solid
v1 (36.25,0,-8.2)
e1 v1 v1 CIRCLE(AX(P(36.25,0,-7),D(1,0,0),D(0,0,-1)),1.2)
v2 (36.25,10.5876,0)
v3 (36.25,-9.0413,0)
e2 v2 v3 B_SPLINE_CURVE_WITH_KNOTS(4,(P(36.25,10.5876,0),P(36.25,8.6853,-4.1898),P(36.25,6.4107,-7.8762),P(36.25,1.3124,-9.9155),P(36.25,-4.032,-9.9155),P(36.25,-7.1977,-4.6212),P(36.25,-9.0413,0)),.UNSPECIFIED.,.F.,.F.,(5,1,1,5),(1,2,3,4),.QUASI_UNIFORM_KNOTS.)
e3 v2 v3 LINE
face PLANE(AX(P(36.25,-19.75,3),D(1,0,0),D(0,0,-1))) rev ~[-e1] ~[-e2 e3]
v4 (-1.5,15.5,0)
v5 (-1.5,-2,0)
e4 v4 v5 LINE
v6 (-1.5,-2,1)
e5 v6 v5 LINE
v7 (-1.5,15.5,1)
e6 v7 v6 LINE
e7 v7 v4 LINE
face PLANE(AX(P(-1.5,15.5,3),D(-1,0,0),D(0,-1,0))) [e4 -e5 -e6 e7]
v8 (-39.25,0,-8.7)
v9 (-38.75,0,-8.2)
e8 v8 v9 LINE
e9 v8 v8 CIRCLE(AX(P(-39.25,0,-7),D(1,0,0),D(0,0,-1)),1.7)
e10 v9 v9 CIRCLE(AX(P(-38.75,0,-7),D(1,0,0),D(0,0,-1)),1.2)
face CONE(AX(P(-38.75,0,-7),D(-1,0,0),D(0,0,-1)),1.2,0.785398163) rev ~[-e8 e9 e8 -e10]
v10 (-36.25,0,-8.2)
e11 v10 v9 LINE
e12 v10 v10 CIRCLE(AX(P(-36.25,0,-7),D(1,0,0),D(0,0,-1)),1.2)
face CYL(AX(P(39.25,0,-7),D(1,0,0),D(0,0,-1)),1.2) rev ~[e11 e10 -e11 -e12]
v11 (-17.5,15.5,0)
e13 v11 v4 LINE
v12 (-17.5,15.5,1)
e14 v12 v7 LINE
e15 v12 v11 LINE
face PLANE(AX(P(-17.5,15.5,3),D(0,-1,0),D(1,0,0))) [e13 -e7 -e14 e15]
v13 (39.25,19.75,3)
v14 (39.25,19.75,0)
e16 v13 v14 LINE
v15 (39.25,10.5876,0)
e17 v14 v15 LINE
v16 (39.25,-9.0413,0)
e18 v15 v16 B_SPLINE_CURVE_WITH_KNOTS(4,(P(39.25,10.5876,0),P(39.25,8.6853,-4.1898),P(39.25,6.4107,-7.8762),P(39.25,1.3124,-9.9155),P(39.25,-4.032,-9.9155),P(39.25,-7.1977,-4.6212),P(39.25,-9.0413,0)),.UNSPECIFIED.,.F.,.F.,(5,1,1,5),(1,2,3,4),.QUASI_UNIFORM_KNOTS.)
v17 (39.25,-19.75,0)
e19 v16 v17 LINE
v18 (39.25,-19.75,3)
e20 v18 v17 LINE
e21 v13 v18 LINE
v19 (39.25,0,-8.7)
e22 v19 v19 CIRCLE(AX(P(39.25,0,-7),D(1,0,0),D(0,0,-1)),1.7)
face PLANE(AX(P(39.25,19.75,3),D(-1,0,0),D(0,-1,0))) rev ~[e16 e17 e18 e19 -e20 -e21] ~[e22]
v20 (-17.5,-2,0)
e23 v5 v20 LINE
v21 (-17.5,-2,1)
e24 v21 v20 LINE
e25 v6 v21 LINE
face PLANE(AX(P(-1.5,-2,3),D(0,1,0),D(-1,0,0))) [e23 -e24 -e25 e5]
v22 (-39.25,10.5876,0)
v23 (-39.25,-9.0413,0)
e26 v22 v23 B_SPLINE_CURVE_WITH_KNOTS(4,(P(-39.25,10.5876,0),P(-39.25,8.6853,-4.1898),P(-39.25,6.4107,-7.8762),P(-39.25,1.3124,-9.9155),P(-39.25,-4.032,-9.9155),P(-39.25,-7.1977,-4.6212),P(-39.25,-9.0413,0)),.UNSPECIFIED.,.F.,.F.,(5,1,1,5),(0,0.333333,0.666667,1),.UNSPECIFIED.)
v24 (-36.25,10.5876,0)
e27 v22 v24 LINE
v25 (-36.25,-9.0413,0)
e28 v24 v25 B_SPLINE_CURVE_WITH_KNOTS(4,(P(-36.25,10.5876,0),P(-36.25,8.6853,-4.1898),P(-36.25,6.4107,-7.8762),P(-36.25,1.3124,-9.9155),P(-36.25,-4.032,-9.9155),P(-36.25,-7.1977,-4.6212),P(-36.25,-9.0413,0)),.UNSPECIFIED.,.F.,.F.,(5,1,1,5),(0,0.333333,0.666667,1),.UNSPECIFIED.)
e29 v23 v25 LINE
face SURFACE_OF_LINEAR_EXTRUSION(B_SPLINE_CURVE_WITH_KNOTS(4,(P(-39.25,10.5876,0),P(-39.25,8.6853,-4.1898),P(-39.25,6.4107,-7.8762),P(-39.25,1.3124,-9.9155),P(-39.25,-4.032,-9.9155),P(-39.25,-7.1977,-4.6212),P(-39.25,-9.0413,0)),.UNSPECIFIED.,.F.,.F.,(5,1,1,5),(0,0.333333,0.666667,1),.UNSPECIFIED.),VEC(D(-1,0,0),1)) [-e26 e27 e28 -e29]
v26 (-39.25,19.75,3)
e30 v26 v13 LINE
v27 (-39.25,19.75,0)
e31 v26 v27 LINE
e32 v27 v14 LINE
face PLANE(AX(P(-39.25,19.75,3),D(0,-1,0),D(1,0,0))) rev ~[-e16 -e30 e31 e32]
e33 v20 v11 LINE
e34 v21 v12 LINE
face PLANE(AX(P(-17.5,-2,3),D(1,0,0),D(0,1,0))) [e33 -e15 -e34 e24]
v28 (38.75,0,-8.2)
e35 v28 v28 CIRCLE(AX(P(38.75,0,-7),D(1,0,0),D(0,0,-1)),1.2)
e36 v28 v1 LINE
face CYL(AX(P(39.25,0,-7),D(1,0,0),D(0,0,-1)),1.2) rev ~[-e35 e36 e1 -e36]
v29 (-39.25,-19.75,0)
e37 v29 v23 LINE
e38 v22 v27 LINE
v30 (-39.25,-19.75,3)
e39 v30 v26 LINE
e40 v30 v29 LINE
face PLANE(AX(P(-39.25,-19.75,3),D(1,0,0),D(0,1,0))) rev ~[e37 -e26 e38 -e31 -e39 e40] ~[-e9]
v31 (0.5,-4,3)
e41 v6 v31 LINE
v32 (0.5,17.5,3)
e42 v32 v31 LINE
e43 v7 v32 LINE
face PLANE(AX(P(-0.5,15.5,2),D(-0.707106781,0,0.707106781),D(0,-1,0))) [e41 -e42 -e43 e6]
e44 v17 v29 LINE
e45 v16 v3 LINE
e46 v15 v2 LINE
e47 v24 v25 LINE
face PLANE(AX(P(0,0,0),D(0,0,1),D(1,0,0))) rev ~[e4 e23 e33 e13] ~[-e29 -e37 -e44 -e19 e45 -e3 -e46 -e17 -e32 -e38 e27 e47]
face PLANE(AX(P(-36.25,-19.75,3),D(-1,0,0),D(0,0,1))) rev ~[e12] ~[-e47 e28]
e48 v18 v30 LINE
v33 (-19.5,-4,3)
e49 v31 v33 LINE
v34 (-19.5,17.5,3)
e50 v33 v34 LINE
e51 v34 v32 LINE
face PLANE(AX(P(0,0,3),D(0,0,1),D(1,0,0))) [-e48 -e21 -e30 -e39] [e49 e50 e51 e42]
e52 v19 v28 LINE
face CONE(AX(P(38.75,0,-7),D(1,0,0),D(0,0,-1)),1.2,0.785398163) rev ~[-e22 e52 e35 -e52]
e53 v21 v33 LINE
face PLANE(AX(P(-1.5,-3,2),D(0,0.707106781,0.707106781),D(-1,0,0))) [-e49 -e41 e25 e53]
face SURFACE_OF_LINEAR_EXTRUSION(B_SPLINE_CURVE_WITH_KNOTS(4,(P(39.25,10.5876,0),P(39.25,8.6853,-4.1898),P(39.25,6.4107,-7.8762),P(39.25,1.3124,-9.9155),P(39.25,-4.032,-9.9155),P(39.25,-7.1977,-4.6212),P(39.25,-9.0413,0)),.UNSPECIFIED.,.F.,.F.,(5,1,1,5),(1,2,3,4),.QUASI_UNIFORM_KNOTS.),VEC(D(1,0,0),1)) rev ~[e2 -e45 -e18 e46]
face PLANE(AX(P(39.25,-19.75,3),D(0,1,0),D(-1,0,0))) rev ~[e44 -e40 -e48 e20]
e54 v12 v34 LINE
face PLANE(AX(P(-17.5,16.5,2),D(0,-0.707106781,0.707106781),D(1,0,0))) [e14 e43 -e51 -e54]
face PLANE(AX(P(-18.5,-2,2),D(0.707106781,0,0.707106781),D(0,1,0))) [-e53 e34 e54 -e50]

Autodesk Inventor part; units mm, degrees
ref_plane "YZ Plane" through (0, 0, 0) normal (1, 0, 0) x (0, 1, 0)
ref_plane "XZ Plane" through (0, 0, 0) normal (0, 1, 0) x (-1, 0, 0)
ref_plane "XY Plane" through (0, 0, 0) normal (0, 0, 1) x (1, 0, 0)
sketch "Sketch1" plane through (0, 0, 0) normal (0, 0, 1) x (1, 0, 0)
  line L0 (40, 20.5) -> (40, -20.5) projected
  line L1 (-40, 20.5) -> (40, 20.5) projected
  line L2 (-40, -20.5) -> (-40, 20.5) projected
  line L3 (40, -20.5) -> (-40, -20.5) projected
  line L4 (40, 20.5) -> (40, -20.5) projected
  line L5 (40, -20.5) -> (-40, -20.5) projected
  line L6 (-40, -20.5) -> (-40, 20.5) projected
  line L7 (-40, 20.5) -> (40, 20.5) projected
  line L8 (37, 23.5) -> (-37, 23.5) projected
  line L9 (-43, 17.5) -> (-43, -17.5) projected
  line L10 (-37, -23.5) -> (37, -23.5) projected
  line L11 (43, -17.5) -> (43, 17.5) projected
  line L12 (34.23, -11.25) -> (34.23, 10.75) projected
  line L13 (5.23, -11.25) -> (34.23, -11.25) projected
  line L14 (5.23, 10.75) -> (5.23, -11.25) projected
  line L15 (34.23, 10.75) -> (5.23, 10.75) projected
  circle A0 centre (-26.5, 0.5) radius 5 projected
  arc A1 (37, -23.5) -> (43, -17.5) centre (37, -17.5) ccw projected
  arc A2 (43, 17.5) -> (37, 23.5) centre (37, 17.5) ccw projected
  arc A3 (-37, 23.5) -> (-43, 17.5) centre (-37, 17.5) ccw projected
  arc A4 (-43, -17.5) -> (-37, -23.5) centre (-37, -17.5) ccw projected
  point P0 (0, 0)
extrude "Extrusion1" add sketch "Sketch1" along normal blind 3 contours L0 L3 L2 L1 | A2 L11 A1 L10 A4 L9 A3 L8 | L13 L14 L15 L12 | A0
sketch "Sketch2" plane through (0, 0, 3) normal (0, 0, 1) x (1, 0, 0)
  line L0 (39.5, 20) -> (-39.5, 20) projected
  line L1 (-39.5, 20) -> (-39.5, -20) projected
  line L2 (-39.5, -20) -> (39.5, -20) projected
  line L3 (39.5, -20) -> (39.5, 20) projected
  line L4 (-17.5, 15.5) -> (-1.5, 15.5)
  line L5 (-1.5, 15.5) -> (-1.5, -2)
  line L6 (-1.5, -2) -> (-17.5, -2)
  line L7 (-17.5, -2) -> (-17.5, 15.5)
  line L8 (-17.5, 15.5) -> (-1.5, -2) construction
  line L9 (-1.5, 15.5) -> (-17.5, -2) construction
  point P0 (0, 0)
  point P1 (-9.5, 6.75)
  dimension "d2" = 16
  dimension "d3" = 17.5
  dimension "d4" = 18
  dimension "d6" = 41
extrude "Extrusion2" cut sketch "Sketch2" against normal blind 3 contours L4 L5 L6 L7
chamfer "Chamfer1" distance 2 angle 45 4 edges at (-1.5, 6.75, 3) (-17.5, 6.75, 3) (-9.5, -2, 3) (-9.5, 15.5, 3)
sketch "Sketch3" plane through (0, 0, 3) normal (0, 0, 1) x (1, 0, 0)
  line L0 (37, 23.5) -> (-37, 23.5) projected
  arc A0 (-37, 23.5) -> (-43, 17.5) centre (-37, 17.5) ccw projected
  line L1 (-43, 17.5) -> (-43, -17.5) projected
  arc A1 (-43, -17.5) -> (-37, -23.5) centre (-37, -17.5) ccw projected
  line L2 (-37, -23.5) -> (37, -23.5) projected
  arc A2 (37, -23.5) -> (43, -17.5) centre (37, -17.5) ccw projected
  line L3 (43, -17.5) -> (43, 17.5) projected
  arc A3 (43, 17.5) -> (37, 23.5) centre (37, 17.5) ccw projected
  line L4 (34.23, -11.25) -> (34.23, 10.75) projected
  line L5 (5.23, -11.25) -> (34.23, -11.25) projected
  line L6 (5.23, 10.75) -> (5.23, -11.25) projected
  line L7 (34.23, 10.75) -> (5.23, 10.75) projected
  line L8 (40, 20.5) -> (40, -20.5) projected
  line L9 (-40, 20.5) -> (40, 20.5) projected
  line L10 (-40, -20.5) -> (-40, 20.5) projected
  line L11 (40, -20.5) -> (-40, -20.5) projected
  circle A4 centre (-26.5, 0.5) radius 5 projected
  point P0 (0, 0)
extrude "Extrusion3" cut sketch "Sketch3" against normal blind 3 contours A3 L3 A2 L2 A1 L1 A0 L0
sketch "Sketch4" plane through (0, 0, 3) normal (0, 0, 1) x (1, 0, 0)
  line L0 (40, 20.5) -> (-40, 20.5) projected
  line L1 (-40, 20.5) -> (-40, -20.5) projected
  line L2 (-40, -20.5) -> (40, -20.5) projected
  line L3 (40, -20.5) -> (40, 20.5) projected
  line L4 (-39.25, 19.75) -> (39.25, 19.75)
  line L5 (39.25, 19.75) -> (39.25, -19.75)
  line L6 (39.25, -19.75) -> (-39.25, -19.75)
  line L7 (-39.25, -19.75) -> (-39.25, 19.75)
  line L8 (-39.25, 19.75) -> (39.25, -19.75) construction
  line L9 (39.25, 19.75) -> (-39.25, -19.75) construction
  point P0 (0, 0)
  dimension "d14" = 78.5
  dimension "d15" = 39.5
extrude "Extrusion4" cut sketch "Sketch4" against normal blind 3
sketch "Sketch5" plane through (0, 0, 0) normal (0, 0, -1) x (-1, 0, 0)
  line L0 (39.25, -19.75) -> (39.25, 19.75) projected
  line L1 (39.25, 19.75) -> (-39.25, 19.75) projected
  line L2 (-39.25, 19.75) -> (-39.25, -19.75) projected
  line L3 (-39.25, -19.75) -> (39.25, -19.75) projected
  line L4 (17.5, 15.5) -> (17.5, -2) projected
  line L5 (17.5, -2) -> (1.5, -2) projected
  line L6 (1.5, -2) -> (1.5, 15.5) projected
  line L7 (1.5, 15.5) -> (17.5, 15.5) projected
  point P0 (0, 0)
sketch "Sketch6" plane through (39.25, -19.75, 3) normal (1, 0, 0) x (0, 0, -1)
  line L0 (3, 39.5) -> (3, 0) projected
  line L1 (3, 30.3376) -> (7.1898, 28.4353) construction
  line L2 (7.1898, 28.4353) -> (10.8762, 26.1607) construction
  line L3 (10.8762, 26.1607) -> (12.9155, 21.0624) construction
  line L4 (12.9155, 21.0624) -> (12.9155, 15.718) construction
  line L5 (12.9155, 15.718) -> (7.6212, 12.5523) construction
  line L6 (7.6212, 12.5523) -> (3, 10.7087) construction
  spline S0 degree 4 poles (3, 30.3376) (7.1898, 28.4353) (10.8762, 26.1607) (12.9155, 21.0624) (12.9155, 15.718) (7.6212, 12.5523) (3, 10.7087) knots 1 1 1 1 1 2 3 4 4 4 4 4
  line L7 (3, 30.3376) -> (3, 10.7087)
  point P0 (3, 19.75)
extrude "Extrusion5" add sketch "Sketch6" against normal blind 3
sketch "Sketch7" plane through (-39.25, -19.75, 3) normal (-1, 0, 0) x (0, 0, 1)
  line L0 (-3, 30.3376) -> (-3, 10.7087) projected
  spline S0 degree 4 poles (-3, 30.3376) (-7.1898, 28.4353) (-10.8762, 26.1607) (-12.9155, 21.0624) (-12.9155, 15.718) (-7.6212, 12.5523) (-3, 10.7087) knots 0 0 0 0 0 0.333333 0.666667 1 1 1 1 1 projected
  point P0 (-3, 19.75)
extrude "Extrusion6" add sketch "Sketch7" against normal blind 3
sketch "Sketch8" plane through (39.25, -19.75, 3) normal (1, 0, 0) x (0, 0, -1)
  line L0 (0, 0) -> (0, 39.5) projected
  circle A0 centre (10, 19.75) radius 1.2
  point P0 (3, 19.75)
  dimension "d22" = 2.4
  dimension "d23" = 10
extrude "Extrusion7" cut sketch "Sketch8" against normal through all
chamfer "Chamfer2" distance 0.5 angle 45 2 edges at (39.25, 0, -5.8) (-39.25, 0, -5.8)
sketch "Sketch9" plane through (0, 0, 0) normal (0, 0, -1) x (-1, 0, 0)
  line L0 (39.25, -9.0413) -> (36.25, -9.0413) projected
  line L1 (36.25, -9.0413) -> (36.25, 10.5876) projected
  line L2 (36.25, 10.5876) -> (39.25, 10.5876) projected
  line L3 (39.25, 10.5876) -> (39.25, 19.75) projected
  line L4 (39.25, 19.75) -> (-39.25, 19.75) projected
  line L5 (-39.25, 19.75) -> (-39.25, 10.5876) projected
  line L6 (-39.25, 10.5876) -> (-36.25, 10.5876) projected
  line L7 (-36.25, 10.5876) -> (-36.25, -9.0413) projected
  line L8 (-36.25, -9.0413) -> (-39.25, -9.0413) projected
  line L9 (-39.25, -9.0413) -> (-39.25, -19.75) projected
  line L10 (-39.25, -19.75) -> (39.25, -19.75) projected
  line L11 (39.25, -19.75) -> (39.25, -9.0413) projected
  line L12 (17.5, 15.5) -> (17.5, -2) projected
  line L13 (17.5, -2) -> (1.5, -2) projected
  line L14 (1.5, -2) -> (1.5, 15.5) projected
  line L15 (1.5, 15.5) -> (17.5, 15.5) projected
  point P0 (0, 0)
properties part number "obudowa - timer- back"
